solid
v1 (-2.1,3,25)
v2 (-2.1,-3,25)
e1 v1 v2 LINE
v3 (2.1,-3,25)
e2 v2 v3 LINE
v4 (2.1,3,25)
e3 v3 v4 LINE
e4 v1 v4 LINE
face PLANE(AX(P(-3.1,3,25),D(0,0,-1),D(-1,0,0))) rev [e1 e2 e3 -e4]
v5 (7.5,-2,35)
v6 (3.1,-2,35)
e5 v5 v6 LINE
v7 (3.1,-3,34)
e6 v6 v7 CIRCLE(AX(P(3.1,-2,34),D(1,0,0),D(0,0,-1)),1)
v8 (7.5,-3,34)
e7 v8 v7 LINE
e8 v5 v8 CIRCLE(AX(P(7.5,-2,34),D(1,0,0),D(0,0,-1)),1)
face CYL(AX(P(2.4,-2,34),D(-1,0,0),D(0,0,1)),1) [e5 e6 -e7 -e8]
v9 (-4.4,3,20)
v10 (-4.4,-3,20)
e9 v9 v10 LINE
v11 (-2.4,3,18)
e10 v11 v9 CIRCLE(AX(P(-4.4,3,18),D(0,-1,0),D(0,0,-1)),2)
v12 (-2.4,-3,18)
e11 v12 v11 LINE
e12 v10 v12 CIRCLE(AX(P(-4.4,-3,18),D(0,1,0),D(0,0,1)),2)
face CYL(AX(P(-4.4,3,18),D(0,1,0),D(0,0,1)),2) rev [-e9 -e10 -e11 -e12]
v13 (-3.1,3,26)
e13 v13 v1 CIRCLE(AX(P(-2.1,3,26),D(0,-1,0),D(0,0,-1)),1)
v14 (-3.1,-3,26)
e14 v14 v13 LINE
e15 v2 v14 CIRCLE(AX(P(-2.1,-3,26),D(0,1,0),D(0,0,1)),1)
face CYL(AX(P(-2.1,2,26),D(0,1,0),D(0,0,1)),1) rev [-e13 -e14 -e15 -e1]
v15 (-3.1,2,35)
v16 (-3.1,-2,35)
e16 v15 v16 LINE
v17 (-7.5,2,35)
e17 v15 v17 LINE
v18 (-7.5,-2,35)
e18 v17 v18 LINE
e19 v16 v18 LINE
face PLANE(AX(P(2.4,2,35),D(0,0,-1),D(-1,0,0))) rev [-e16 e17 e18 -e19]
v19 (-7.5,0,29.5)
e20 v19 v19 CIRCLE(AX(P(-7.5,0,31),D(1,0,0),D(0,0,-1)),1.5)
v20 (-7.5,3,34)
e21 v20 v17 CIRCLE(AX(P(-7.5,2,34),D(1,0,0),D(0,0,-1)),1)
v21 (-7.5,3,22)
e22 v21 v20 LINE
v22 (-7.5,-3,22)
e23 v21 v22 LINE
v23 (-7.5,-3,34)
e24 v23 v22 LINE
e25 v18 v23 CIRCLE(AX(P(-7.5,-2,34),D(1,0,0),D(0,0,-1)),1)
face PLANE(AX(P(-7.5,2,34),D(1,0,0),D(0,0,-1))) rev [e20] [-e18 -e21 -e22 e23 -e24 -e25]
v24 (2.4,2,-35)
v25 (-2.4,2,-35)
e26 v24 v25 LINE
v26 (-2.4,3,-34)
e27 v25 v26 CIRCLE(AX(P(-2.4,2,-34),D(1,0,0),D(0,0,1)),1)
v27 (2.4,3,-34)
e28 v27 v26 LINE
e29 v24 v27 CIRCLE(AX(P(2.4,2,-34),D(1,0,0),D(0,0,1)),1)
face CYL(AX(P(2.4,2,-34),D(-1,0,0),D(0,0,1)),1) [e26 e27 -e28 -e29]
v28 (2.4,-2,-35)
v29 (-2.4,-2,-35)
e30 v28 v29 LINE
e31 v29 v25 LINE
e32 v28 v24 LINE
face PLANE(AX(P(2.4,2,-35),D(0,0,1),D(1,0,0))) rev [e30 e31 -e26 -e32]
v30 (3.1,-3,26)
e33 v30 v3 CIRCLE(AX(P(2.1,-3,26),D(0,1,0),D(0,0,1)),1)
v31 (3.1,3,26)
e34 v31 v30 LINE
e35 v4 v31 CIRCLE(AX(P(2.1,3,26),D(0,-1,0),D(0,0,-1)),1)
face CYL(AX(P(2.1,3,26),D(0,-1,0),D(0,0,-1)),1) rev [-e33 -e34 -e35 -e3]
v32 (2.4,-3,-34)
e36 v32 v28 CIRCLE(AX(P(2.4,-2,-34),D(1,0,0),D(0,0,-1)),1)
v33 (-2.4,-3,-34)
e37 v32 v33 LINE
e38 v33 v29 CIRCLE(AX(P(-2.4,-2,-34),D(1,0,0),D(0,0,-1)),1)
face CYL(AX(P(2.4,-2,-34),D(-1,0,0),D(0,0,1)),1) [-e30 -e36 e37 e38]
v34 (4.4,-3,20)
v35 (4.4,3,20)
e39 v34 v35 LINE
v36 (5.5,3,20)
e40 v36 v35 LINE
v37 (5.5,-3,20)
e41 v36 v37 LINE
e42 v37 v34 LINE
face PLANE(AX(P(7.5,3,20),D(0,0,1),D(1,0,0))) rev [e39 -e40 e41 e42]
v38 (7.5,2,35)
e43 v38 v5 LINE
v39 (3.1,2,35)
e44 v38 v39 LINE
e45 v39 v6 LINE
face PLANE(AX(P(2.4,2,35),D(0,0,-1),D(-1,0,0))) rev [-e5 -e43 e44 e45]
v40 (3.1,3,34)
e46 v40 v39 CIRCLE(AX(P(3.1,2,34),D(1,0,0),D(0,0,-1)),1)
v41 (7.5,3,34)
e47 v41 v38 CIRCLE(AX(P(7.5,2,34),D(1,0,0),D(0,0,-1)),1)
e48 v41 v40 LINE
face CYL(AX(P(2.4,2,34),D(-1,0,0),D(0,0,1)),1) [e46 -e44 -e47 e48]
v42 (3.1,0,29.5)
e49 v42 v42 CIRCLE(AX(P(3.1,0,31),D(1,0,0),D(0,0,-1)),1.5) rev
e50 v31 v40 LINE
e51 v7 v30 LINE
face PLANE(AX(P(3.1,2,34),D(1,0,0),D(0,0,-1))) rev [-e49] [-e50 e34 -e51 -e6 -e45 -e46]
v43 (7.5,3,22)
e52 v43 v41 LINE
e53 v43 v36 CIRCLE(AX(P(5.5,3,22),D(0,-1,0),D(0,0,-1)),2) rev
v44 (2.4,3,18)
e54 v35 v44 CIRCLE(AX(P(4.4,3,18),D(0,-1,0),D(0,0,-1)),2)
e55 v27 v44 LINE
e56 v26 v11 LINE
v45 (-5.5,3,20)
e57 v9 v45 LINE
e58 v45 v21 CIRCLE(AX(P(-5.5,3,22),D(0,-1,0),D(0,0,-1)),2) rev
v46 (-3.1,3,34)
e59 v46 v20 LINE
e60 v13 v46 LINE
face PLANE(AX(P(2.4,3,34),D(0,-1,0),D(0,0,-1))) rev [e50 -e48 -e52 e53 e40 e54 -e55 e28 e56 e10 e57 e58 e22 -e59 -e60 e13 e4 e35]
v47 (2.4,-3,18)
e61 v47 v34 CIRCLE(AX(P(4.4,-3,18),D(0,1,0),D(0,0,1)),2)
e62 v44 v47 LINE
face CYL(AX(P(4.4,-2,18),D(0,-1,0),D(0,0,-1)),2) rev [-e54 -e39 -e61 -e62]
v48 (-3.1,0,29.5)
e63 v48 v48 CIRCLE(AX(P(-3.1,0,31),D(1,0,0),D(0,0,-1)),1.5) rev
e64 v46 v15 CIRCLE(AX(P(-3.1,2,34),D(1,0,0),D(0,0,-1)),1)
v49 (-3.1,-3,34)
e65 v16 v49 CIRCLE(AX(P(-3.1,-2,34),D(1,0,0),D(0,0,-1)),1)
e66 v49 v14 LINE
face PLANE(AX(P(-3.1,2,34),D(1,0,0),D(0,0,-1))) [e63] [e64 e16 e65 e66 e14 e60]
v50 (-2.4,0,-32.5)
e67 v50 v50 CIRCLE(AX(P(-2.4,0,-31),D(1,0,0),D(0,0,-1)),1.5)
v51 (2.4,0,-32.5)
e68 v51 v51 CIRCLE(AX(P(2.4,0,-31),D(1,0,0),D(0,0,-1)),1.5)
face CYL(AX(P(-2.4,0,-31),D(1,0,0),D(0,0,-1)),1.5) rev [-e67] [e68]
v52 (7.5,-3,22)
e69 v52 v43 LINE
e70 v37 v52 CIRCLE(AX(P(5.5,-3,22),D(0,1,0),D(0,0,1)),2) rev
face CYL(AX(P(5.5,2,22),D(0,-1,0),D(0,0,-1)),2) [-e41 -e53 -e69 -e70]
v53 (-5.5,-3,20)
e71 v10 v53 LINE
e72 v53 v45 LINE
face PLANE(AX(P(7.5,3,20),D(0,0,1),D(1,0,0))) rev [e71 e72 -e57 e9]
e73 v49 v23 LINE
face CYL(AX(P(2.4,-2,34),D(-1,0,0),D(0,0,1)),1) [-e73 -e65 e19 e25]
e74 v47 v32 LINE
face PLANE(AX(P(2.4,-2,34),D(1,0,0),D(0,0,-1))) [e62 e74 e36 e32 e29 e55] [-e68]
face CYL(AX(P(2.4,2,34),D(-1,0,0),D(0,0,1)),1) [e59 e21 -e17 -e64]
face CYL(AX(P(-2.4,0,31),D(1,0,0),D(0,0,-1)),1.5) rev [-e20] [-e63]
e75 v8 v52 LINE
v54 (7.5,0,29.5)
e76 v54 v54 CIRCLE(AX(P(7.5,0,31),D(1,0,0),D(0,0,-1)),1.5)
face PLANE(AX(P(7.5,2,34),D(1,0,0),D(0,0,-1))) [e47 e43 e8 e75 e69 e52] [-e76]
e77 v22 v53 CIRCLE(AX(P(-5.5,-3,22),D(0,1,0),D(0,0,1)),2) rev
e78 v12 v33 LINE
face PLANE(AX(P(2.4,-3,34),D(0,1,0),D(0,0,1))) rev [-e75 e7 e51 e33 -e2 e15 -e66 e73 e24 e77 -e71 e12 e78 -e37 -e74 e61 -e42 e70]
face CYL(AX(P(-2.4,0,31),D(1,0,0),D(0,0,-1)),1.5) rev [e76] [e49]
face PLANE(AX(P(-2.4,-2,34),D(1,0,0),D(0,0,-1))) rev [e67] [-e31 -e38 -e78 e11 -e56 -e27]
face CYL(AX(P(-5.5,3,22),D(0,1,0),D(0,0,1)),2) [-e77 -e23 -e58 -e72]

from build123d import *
from build123d.topology import SkipClean

# Parameters (mm, degrees)
SALIENTE_EXTRUIR1_DEPTH    = 2.4
CORTAR_EXTRUIR1_DEPTH      = 36.210225787
CORTAR_EXTRUIR1_DEPTH_BACK = 36.210225787
CROQUIS2_R                 = 1.5
CROQUIS3_R                 = 1.5
SALIENTE_EXTRUIR2_DEPTH    = 7.5
CORTAR_EXTRUIR2_DEPTH      = 3.1
REDONDEO1_R                = 2
REDONDEO2_R                = 1


with BuildPart() as part:
    # Croquis1 → Saliente-Extruir1 (new, symmetric)
    with BuildSketch(Plane(origin=(0, 0, 0), x_dir=(0, 0, -1), z_dir=(1, 0, 0))):
        with BuildLine():
            Line((-34, 3), (34, 3))
            ThreePointArc((34, 3), (34.707106781, 2.707106781), (35, 2))
            Line((35, 2), (35, -2))
            ThreePointArc((35, -2), (34.707106781, -2.707106781), (34, -3))
            Line((34, -3), (-34, -3))
            ThreePointArc((-34, -3), (-34.707106781, -2.707106781), (-35, -2))
            Line((-35, -2), (-35, 2))
            ThreePointArc((-35, 2), (-34.707106781, 2.707106781), (-34, 3))
        make_face()
    extrude(amount=SALIENTE_EXTRUIR1_DEPTH, both=True)

    # Croquis2 → Cortar-Extruir1 (cut, two sides: drawn at the far end of the back side and taken through both)
    with BuildSketch(Plane(origin=(0, 0, 0), x_dir=(0, 0, -1), z_dir=(1, 0, 0)).offset(-CORTAR_EXTRUIR1_DEPTH_BACK)):
        with Locations((-31, 0)):
            Circle(CROQUIS2_R)
        with Locations((31, 0)):
            Circle(CROQUIS2_R)
    extrude(amount=CORTAR_EXTRUIR1_DEPTH + CORTAR_EXTRUIR1_DEPTH_BACK, mode=Mode.SUBTRACT)

    # Croquis3 → Saliente-Extruir2 (add, symmetric)
    with SkipClean():  # the faces are left unmerged after this step: merging them gives an invalid solid
        with BuildSketch(Plane(origin=(0, 0, 0), x_dir=(0, 0, -1), z_dir=(1, 0, 0))):
            with BuildLine():
                Line((-35, 2), (-35, -2))
                ThreePointArc((-35, -2), (-34.707106781, -2.707106781), (-34, -3))
                Line((-34, -3), (-20, -3))
                Line((-20, -3), (-20, 3))
                Line((-20, 3), (-34, 3))
                ThreePointArc((-34, 3), (-34.707106781, 2.707106781), (-35, 2))
            make_face()
            with Locations((-31, 0)):
                Circle(CROQUIS3_R, mode=Mode.SUBTRACT)
        extrude(amount=SALIENTE_EXTRUIR2_DEPTH, both=True)
    add(part.part.scale(1), mode=Mode.REPLACE)  # the faces are merged on a copy

    # Croquis4 → Cortar-Extruir2 (cut, symmetric)
    with BuildSketch(Plane(origin=(0, 0, 0), x_dir=(0, 0, -1), z_dir=(1, 0, 0))):
        with BuildLine():
            Line((-34, 3), (-25, 3))
            Line((-25, 3), (-25, -3))
            Line((-25, -3), (-34, -3))
            ThreePointArc((-34, -3), (-34.707106781, -2.707106781), (-35, -2))
            Line((-35, -2), (-35, 2))
            ThreePointArc((-35, 2), (-34.707106781, 2.707106781), (-34, 3))
        make_face()
    extrude(amount=CORTAR_EXTRUIR2_DEPTH, both=True, mode=Mode.SUBTRACT)

    # Redondeo1
    redondeo1_edges = [part.edges().sort_by_distance(p)[0] for p in [
        (-2.4, 0, 20),
        (2.4, 0, 20),
        (-7.5, 0, 20),
        (7.5, 0, 20),
    ]]
    fillet(redondeo1_edges, radius=REDONDEO1_R)

    # Redondeo2
    redondeo2_edges = [part.edges().sort_by_distance(p)[0] for p in [
        (3.1, 0, 25),
        (-3.1, 0, 25),
    ]]
    fillet(redondeo2_edges, radius=REDONDEO2_R)


solid = part.part
